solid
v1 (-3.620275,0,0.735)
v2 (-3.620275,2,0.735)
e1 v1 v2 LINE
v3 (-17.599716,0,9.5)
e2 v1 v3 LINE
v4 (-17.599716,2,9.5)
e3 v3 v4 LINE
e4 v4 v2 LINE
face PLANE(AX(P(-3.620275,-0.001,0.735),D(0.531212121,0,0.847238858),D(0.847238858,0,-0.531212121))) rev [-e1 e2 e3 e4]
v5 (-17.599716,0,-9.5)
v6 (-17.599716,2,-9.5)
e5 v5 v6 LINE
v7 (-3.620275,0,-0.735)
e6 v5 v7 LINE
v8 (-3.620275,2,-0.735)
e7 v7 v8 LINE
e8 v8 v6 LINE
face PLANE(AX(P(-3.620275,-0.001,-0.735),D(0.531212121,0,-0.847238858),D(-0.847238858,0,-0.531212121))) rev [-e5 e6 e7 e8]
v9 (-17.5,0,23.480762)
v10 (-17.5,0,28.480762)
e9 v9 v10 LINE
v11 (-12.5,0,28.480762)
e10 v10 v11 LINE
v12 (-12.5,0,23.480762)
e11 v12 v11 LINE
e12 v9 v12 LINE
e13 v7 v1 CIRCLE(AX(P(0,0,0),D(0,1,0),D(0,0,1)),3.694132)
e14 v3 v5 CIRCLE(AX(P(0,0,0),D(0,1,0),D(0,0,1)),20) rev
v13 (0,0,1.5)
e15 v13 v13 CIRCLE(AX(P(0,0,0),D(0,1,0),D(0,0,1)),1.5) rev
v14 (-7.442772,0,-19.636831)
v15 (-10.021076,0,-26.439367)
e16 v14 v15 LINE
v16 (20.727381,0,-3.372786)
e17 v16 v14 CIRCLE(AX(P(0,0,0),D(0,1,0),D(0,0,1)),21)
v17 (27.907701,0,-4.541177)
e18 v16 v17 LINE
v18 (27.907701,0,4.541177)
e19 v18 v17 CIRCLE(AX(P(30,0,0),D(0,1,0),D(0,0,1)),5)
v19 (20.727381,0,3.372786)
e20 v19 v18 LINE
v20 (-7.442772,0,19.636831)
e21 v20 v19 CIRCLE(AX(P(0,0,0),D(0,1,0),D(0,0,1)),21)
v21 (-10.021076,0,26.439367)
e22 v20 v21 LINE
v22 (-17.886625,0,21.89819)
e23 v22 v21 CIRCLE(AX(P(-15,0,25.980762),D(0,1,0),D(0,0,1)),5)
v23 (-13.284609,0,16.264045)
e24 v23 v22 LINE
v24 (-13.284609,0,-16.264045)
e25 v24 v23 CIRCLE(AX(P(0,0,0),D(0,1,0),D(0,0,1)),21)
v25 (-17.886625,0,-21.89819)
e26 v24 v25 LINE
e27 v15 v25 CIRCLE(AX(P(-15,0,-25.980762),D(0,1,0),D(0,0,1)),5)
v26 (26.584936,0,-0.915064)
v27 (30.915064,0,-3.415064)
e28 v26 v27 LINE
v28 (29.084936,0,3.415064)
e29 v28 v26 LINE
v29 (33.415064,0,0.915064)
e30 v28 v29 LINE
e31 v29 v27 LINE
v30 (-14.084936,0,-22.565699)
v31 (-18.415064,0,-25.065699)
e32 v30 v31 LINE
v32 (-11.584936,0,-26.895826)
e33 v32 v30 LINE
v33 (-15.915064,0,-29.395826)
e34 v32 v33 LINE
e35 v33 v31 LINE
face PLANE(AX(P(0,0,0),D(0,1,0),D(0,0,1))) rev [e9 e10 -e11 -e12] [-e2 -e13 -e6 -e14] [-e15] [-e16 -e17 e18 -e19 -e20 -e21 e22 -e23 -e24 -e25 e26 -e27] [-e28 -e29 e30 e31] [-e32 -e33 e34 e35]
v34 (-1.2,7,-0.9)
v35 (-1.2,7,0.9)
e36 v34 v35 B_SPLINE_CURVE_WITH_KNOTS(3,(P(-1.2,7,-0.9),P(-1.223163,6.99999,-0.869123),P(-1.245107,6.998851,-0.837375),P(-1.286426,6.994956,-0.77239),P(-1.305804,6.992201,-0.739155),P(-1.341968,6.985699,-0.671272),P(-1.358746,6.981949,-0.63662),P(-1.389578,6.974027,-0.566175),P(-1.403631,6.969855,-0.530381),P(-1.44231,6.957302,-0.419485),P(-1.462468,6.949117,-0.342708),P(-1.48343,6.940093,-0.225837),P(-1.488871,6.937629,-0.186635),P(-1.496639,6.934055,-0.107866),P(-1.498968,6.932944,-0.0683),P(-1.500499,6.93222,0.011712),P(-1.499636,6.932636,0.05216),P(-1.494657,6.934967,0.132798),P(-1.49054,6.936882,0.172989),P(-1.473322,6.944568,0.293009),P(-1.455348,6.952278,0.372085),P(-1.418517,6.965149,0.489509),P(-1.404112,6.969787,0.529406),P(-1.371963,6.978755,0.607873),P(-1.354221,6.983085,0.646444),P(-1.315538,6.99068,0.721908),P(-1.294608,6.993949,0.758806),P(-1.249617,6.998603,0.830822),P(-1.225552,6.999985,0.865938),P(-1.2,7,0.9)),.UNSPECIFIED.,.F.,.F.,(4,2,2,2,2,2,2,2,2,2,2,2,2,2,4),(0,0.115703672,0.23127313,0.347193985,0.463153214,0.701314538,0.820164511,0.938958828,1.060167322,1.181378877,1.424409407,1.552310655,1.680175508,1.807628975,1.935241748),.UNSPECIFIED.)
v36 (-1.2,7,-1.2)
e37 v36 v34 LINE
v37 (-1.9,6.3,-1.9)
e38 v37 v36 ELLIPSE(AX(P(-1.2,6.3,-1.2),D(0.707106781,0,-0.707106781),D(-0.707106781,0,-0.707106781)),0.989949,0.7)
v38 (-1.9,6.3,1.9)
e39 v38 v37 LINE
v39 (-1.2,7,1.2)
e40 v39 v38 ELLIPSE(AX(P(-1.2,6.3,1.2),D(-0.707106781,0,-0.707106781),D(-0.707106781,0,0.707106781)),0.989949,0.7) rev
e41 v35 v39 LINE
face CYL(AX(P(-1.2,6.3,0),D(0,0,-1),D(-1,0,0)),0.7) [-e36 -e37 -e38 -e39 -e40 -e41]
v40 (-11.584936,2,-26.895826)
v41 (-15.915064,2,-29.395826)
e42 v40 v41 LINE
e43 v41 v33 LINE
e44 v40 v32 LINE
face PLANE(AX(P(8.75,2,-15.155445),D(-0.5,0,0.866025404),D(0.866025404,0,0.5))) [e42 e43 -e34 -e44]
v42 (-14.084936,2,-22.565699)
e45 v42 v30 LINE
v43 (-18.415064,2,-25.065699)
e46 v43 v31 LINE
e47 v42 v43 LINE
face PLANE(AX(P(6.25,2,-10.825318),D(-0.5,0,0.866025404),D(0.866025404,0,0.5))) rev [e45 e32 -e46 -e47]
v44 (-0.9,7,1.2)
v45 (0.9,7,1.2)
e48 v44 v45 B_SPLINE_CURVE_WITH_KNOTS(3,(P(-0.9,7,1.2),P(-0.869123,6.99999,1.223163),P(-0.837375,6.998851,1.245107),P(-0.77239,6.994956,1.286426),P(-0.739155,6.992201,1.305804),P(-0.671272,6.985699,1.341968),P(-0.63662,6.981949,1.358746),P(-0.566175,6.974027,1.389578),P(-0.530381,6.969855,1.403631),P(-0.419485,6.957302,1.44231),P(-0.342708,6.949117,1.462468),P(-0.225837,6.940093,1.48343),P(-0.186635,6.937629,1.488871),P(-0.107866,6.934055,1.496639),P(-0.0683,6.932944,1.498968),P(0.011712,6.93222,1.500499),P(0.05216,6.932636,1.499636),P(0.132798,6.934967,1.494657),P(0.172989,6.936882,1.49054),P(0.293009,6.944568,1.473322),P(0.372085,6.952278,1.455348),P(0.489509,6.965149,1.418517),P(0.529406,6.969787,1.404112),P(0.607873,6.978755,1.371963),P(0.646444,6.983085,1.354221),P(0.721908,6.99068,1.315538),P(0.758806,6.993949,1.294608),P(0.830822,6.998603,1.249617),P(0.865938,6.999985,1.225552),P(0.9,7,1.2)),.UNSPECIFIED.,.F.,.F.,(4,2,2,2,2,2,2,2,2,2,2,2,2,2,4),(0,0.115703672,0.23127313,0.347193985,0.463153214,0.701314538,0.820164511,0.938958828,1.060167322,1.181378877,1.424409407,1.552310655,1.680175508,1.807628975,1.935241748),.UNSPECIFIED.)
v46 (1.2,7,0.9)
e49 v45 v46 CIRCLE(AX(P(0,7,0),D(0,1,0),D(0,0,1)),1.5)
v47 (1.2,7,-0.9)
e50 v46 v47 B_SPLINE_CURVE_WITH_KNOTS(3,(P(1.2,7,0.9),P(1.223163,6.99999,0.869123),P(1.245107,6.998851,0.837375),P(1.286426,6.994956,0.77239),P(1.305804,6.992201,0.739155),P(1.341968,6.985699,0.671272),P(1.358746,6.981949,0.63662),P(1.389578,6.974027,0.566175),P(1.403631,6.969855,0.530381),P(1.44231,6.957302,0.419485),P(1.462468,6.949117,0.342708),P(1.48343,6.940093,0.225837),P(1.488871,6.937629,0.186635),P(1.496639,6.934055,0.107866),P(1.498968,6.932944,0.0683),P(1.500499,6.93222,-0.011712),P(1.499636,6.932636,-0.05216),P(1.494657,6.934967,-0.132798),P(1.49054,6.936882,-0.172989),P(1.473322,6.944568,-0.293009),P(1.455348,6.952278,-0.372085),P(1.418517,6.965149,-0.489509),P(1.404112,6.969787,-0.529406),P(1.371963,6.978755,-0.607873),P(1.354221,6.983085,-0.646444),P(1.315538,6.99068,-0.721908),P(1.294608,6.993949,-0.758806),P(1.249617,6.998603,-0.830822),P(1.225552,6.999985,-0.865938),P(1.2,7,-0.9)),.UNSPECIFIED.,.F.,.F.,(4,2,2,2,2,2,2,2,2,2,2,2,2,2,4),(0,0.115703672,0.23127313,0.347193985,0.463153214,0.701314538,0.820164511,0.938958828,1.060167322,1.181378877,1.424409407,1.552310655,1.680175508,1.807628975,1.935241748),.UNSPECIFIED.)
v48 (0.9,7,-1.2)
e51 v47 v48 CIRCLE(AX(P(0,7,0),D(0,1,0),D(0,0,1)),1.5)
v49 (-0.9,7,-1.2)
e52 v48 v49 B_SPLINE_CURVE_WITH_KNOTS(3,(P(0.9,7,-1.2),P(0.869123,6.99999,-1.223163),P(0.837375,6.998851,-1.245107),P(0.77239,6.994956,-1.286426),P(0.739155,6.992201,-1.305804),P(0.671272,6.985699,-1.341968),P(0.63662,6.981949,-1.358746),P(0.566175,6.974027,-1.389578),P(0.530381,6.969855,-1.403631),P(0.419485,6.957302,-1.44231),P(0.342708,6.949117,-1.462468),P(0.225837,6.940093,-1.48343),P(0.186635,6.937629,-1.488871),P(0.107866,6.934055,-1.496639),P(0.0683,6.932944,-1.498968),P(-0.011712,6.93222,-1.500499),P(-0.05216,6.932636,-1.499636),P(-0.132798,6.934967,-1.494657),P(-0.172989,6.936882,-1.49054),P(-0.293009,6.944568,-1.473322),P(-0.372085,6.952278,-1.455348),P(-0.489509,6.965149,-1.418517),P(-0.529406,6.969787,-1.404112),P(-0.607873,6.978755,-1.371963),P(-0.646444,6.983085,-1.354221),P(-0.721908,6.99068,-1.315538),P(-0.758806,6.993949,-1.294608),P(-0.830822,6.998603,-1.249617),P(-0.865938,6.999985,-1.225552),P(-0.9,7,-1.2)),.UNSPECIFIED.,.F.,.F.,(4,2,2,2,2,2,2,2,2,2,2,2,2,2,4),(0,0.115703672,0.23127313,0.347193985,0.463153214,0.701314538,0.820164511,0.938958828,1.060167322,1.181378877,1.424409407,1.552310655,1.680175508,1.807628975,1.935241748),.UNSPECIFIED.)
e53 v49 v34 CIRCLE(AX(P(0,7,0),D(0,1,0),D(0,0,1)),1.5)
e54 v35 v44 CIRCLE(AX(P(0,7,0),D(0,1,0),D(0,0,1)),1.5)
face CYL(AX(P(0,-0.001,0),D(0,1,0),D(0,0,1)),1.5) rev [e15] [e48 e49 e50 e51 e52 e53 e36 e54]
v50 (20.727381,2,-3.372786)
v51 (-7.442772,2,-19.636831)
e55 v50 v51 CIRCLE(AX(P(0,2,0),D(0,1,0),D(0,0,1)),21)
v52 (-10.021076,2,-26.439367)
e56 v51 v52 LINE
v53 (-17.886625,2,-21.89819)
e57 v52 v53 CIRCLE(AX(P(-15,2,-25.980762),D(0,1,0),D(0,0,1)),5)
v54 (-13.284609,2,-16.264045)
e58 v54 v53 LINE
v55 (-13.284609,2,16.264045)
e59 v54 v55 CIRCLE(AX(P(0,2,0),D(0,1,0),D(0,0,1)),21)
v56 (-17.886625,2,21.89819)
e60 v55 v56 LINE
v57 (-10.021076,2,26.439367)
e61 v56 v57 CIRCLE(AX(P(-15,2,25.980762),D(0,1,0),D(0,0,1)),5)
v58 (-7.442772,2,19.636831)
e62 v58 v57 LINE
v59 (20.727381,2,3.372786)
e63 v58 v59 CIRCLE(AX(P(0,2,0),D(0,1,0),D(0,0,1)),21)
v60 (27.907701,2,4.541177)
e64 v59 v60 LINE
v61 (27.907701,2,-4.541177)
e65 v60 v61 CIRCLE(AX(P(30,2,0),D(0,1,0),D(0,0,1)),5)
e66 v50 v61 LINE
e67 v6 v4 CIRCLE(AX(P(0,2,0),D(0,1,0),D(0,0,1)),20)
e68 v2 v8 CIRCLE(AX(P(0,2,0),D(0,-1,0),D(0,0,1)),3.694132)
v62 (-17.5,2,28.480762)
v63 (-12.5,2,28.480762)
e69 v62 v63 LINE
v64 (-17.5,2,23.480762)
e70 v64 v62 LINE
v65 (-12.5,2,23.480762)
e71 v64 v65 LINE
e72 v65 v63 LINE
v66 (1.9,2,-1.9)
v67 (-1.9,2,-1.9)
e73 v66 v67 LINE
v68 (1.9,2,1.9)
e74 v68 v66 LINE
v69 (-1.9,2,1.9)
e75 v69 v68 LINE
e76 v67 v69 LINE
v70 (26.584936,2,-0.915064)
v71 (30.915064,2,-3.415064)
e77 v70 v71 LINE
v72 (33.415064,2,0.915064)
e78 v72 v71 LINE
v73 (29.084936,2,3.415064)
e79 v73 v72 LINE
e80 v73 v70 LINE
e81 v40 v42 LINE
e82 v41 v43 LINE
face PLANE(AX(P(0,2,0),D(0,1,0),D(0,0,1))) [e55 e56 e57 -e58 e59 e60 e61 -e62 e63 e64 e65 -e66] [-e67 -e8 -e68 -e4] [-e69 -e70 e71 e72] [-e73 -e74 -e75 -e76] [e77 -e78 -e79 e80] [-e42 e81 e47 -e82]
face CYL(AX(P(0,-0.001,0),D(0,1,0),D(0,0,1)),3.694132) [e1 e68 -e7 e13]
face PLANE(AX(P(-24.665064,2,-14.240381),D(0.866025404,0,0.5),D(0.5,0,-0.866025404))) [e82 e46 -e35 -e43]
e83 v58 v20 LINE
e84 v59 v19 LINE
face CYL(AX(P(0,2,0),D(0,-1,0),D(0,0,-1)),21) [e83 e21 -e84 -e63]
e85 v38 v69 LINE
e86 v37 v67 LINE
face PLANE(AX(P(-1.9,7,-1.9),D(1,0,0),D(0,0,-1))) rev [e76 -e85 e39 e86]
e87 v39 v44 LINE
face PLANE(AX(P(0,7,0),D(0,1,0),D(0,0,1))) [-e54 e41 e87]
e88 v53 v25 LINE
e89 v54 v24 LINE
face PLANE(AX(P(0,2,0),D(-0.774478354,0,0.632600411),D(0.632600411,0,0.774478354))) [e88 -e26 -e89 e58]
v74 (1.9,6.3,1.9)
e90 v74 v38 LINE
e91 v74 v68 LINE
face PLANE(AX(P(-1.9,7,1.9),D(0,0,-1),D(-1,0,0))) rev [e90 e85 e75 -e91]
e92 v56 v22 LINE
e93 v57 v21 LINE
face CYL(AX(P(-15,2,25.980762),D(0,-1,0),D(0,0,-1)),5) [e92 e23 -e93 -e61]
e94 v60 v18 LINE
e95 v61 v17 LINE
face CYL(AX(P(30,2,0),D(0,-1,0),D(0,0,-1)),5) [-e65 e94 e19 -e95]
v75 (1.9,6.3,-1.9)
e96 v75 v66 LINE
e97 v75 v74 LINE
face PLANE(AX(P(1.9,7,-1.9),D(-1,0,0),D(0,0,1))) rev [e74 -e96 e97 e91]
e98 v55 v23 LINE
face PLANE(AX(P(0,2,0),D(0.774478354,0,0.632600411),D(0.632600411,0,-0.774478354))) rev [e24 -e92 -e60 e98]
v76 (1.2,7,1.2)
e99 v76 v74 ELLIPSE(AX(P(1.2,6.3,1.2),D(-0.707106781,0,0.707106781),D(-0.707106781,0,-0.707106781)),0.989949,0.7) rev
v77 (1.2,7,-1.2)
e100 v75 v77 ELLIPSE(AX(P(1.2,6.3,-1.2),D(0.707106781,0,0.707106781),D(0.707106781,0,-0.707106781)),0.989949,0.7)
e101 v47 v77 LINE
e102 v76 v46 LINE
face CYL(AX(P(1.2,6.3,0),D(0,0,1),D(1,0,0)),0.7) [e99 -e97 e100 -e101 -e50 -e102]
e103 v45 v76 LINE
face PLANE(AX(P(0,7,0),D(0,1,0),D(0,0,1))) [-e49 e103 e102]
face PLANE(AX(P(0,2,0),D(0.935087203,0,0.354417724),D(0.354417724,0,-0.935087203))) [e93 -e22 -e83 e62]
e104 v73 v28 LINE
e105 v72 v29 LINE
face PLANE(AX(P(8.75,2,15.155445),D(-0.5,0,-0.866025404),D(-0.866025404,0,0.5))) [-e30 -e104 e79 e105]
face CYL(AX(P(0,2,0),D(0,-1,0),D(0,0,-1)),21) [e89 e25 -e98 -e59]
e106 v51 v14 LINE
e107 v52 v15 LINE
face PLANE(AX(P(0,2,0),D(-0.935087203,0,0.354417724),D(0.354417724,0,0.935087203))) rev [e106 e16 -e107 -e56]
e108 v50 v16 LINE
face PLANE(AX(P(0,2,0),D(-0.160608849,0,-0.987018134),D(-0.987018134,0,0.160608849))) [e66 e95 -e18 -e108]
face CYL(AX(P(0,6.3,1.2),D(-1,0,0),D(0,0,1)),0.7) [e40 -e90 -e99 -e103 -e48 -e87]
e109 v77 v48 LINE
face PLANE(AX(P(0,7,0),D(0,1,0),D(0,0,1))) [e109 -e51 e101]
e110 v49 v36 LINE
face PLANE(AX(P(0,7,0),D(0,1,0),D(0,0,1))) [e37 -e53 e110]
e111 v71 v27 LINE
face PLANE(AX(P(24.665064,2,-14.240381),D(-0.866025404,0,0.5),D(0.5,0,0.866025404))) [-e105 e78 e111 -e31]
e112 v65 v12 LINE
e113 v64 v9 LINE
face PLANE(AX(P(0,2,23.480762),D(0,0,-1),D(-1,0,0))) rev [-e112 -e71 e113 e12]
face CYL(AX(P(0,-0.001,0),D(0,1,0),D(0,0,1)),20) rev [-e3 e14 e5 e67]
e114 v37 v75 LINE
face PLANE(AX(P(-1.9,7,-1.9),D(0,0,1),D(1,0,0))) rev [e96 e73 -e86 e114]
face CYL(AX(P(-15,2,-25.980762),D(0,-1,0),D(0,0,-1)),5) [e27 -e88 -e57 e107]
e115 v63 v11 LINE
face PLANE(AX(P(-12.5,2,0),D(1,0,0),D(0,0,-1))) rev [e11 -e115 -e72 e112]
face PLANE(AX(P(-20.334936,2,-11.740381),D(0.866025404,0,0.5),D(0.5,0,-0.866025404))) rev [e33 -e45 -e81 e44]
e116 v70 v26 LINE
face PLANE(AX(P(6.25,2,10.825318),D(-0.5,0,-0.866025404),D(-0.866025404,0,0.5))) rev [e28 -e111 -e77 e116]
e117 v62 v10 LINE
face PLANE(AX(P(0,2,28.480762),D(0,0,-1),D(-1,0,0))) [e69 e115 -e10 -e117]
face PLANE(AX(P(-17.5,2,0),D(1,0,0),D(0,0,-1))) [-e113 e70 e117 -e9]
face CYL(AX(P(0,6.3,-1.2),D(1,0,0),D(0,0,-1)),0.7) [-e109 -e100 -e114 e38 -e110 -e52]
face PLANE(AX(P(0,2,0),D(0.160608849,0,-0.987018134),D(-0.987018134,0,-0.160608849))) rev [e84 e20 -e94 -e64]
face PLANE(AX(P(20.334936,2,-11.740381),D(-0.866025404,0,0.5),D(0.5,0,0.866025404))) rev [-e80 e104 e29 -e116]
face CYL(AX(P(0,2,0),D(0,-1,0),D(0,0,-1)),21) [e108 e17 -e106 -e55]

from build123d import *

# Parameters (mm, degrees)
SKETCH1_R           = 21
SKETCH1_W           = 5
SKETCH1_H           = 5
BOSS_EXTRUDE1_DEPTH = 2
SKETCH2_W           = 3.8
SKETCH2_H           = 3.8
BOSS_EXTRUDE2_DEPTH = 5
CUT_EXTRUDE1_REACH  = 49.263
SKETCH3_R           = 1.5
CUT_EXTRUDE2_REACH  = 49.009
FILLET1_R           = 0.7


with BuildPart() as part:
    # Sketch1 → Boss-Extrude1 (new body)
    # profile 1 of 6: a face of its own
    with BuildSketch(Plane(origin=(0, 0, 0), x_dir=(1, 0, 0), z_dir=(0, 1, 0))):
        Circle(SKETCH1_R)
    # profile 2 of 6: a face of its own
    with BuildSketch(Plane(origin=(0, 0, 0), x_dir=(1, 0, 0), z_dir=(0, 1, 0))):
        with BuildLine():
            Line((0, 0), (-17.886625066, -21.898189918))
            ThreePointArc((-17.886625066, -21.898189918), (-17.5, -30.310889132), (-10.021076233, -26.439366654))
            Line((-10.021076233, -26.439366654), (0, 0))
        make_face()
        with Locations((-15, -25.980762114)):
            Rectangle(SKETCH1_W, SKETCH1_H, mode=Mode.SUBTRACT)
    # profile 3 of 6: a face of its own
    with BuildSketch(Plane(origin=(0, 0, 0), x_dir=(1, 0, 0), z_dir=(0, 1, 0))):
        Circle(SKETCH1_R)
    # profile 4 of 6: a face of its own
    with BuildSketch(Plane(origin=(0, 0, 0), x_dir=(1, 0, 0), z_dir=(0, 1, 0))):
        with BuildLine():
            Line((0, 0), (27.907701299, -4.541176736))
            ThreePointArc((27.907701299, -4.541176736), (35, 0), (27.907701299, 4.541176736))
            Line((27.907701299, 4.541176736), (0, 0))
        make_face()
        Polygon((29.084936491, -3.415063509), (26.584936491, 0.915063509), (30.915063509, 3.415063509), (33.415063509, -0.915063509), align=None, mode=Mode.SUBTRACT)
    # profile 5 of 6: a face of its own
    with BuildSketch(Plane(origin=(0, 0, 0), x_dir=(1, 0, 0), z_dir=(0, 1, 0))):
        Circle(SKETCH1_R)
    # profile 6 of 6: a face of its own
    with BuildSketch(Plane(origin=(0, 0, 0), x_dir=(1, 0, 0), z_dir=(0, 1, 0))):
        with BuildLine():
            Line((0, 0), (-10.021076233, 26.439366654))
            ThreePointArc((-10.021076233, 26.439366654), (-17.5, 30.310889132), (-17.886625066, 21.898189918))
            Line((-17.886625066, 21.898189918), (0, 0))
        make_face()
        Polygon((-11.584936491, 26.895825623), (-14.084936491, 22.565698604), (-18.415063509, 25.065698604), (-15.915063509, 29.395825623), align=None, mode=Mode.SUBTRACT)
    extrude(amount=BOSS_EXTRUDE1_DEPTH)

    # Sketch2 → Boss-Extrude2 (add)
    with BuildSketch(Plane(origin=(0, 2, 0), x_dir=(1, 0, 0), z_dir=(0, 1, 0))):
        Rectangle(SKETCH2_W, SKETCH2_H)
    extrude(amount=BOSS_EXTRUDE2_DEPTH)

    # Sketch3 → Cut-Extrude1 (cut, up to next)
    with BuildSketch(Plane(origin=(0, 7, 0), x_dir=(1, 0, 0), z_dir=(0, 1, 0)), mode=Mode.PRIVATE) as cut_extrude1_sk1:
        with Locations(Location((0, 0, 0), (0, 0, 270))):
            Circle(SKETCH3_R)
    cut_extrude1_tool1 = extrude(cut_extrude1_sk1.sketch, amount=-CUT_EXTRUDE1_REACH, mode=Mode.PRIVATE) & part.part
    add(cut_extrude1_tool1.solids().sort_by_distance((0, 7, 0))[0], mode=Mode.SUBTRACT)

    # Sketch4 → Cut-Extrude2 (cut, up to next)
    with BuildSketch(Plane(origin=(0, 2, 0), x_dir=(1, 0, 0), z_dir=(0, 1, 0)), mode=Mode.PRIVATE) as cut_extrude2_sk1:
        with BuildLine():
            Line((-3.620274752, -0.735), (-17.599715907, -9.5))
            ThreePointArc((-17.599715907, -9.5), (-20, 0), (-17.599715907, 9.5))
            Line((-17.599715907, 9.5), (-3.620274752, 0.735))
            ThreePointArc((-3.620274752, 0.735), (-3.694132412, 0), (-3.620274752, -0.735))
        make_face()
    cut_extrude2_tool1 = extrude(cut_extrude2_sk1.sketch, amount=-CUT_EXTRUDE2_REACH, mode=Mode.PRIVATE) & part.part
    add(cut_extrude2_tool1.solids().sort_by_distance((-13.664779, 2, 0))[0], mode=Mode.SUBTRACT)

    # Fillet1
    # the kernel refuses this fillet: 0.7 mm, written as the material it takes off along each edge
    with BuildSketch(Plane(origin=(-1.9, 7, 3.65), x_dir=(0, -1, 0), z_dir=(0, 0, -1)), Plane(origin=(3.65, 7, 1.9), x_dir=(0, -1, 0), z_dir=(-1, 0, 0)), Plane(origin=(1.9, 7, -3.65), x_dir=(0, -1, 0), z_dir=(0, 0, 1)), Plane(origin=(-3.65, 7, -1.9), x_dir=(0, -1, 0), z_dir=(1, 0, 0))) as fillet1_piece_1:
        with BuildLine():
            CenterArc((FILLET1_R, -FILLET1_R), FILLET1_R, 90, 90)
            Line((0, -FILLET1_R), (0, 0))
            Line((0, 0), (FILLET1_R, 0))
        make_face()
    extrude(amount=7.3, mode=Mode.SUBTRACT)


solid = part.part
